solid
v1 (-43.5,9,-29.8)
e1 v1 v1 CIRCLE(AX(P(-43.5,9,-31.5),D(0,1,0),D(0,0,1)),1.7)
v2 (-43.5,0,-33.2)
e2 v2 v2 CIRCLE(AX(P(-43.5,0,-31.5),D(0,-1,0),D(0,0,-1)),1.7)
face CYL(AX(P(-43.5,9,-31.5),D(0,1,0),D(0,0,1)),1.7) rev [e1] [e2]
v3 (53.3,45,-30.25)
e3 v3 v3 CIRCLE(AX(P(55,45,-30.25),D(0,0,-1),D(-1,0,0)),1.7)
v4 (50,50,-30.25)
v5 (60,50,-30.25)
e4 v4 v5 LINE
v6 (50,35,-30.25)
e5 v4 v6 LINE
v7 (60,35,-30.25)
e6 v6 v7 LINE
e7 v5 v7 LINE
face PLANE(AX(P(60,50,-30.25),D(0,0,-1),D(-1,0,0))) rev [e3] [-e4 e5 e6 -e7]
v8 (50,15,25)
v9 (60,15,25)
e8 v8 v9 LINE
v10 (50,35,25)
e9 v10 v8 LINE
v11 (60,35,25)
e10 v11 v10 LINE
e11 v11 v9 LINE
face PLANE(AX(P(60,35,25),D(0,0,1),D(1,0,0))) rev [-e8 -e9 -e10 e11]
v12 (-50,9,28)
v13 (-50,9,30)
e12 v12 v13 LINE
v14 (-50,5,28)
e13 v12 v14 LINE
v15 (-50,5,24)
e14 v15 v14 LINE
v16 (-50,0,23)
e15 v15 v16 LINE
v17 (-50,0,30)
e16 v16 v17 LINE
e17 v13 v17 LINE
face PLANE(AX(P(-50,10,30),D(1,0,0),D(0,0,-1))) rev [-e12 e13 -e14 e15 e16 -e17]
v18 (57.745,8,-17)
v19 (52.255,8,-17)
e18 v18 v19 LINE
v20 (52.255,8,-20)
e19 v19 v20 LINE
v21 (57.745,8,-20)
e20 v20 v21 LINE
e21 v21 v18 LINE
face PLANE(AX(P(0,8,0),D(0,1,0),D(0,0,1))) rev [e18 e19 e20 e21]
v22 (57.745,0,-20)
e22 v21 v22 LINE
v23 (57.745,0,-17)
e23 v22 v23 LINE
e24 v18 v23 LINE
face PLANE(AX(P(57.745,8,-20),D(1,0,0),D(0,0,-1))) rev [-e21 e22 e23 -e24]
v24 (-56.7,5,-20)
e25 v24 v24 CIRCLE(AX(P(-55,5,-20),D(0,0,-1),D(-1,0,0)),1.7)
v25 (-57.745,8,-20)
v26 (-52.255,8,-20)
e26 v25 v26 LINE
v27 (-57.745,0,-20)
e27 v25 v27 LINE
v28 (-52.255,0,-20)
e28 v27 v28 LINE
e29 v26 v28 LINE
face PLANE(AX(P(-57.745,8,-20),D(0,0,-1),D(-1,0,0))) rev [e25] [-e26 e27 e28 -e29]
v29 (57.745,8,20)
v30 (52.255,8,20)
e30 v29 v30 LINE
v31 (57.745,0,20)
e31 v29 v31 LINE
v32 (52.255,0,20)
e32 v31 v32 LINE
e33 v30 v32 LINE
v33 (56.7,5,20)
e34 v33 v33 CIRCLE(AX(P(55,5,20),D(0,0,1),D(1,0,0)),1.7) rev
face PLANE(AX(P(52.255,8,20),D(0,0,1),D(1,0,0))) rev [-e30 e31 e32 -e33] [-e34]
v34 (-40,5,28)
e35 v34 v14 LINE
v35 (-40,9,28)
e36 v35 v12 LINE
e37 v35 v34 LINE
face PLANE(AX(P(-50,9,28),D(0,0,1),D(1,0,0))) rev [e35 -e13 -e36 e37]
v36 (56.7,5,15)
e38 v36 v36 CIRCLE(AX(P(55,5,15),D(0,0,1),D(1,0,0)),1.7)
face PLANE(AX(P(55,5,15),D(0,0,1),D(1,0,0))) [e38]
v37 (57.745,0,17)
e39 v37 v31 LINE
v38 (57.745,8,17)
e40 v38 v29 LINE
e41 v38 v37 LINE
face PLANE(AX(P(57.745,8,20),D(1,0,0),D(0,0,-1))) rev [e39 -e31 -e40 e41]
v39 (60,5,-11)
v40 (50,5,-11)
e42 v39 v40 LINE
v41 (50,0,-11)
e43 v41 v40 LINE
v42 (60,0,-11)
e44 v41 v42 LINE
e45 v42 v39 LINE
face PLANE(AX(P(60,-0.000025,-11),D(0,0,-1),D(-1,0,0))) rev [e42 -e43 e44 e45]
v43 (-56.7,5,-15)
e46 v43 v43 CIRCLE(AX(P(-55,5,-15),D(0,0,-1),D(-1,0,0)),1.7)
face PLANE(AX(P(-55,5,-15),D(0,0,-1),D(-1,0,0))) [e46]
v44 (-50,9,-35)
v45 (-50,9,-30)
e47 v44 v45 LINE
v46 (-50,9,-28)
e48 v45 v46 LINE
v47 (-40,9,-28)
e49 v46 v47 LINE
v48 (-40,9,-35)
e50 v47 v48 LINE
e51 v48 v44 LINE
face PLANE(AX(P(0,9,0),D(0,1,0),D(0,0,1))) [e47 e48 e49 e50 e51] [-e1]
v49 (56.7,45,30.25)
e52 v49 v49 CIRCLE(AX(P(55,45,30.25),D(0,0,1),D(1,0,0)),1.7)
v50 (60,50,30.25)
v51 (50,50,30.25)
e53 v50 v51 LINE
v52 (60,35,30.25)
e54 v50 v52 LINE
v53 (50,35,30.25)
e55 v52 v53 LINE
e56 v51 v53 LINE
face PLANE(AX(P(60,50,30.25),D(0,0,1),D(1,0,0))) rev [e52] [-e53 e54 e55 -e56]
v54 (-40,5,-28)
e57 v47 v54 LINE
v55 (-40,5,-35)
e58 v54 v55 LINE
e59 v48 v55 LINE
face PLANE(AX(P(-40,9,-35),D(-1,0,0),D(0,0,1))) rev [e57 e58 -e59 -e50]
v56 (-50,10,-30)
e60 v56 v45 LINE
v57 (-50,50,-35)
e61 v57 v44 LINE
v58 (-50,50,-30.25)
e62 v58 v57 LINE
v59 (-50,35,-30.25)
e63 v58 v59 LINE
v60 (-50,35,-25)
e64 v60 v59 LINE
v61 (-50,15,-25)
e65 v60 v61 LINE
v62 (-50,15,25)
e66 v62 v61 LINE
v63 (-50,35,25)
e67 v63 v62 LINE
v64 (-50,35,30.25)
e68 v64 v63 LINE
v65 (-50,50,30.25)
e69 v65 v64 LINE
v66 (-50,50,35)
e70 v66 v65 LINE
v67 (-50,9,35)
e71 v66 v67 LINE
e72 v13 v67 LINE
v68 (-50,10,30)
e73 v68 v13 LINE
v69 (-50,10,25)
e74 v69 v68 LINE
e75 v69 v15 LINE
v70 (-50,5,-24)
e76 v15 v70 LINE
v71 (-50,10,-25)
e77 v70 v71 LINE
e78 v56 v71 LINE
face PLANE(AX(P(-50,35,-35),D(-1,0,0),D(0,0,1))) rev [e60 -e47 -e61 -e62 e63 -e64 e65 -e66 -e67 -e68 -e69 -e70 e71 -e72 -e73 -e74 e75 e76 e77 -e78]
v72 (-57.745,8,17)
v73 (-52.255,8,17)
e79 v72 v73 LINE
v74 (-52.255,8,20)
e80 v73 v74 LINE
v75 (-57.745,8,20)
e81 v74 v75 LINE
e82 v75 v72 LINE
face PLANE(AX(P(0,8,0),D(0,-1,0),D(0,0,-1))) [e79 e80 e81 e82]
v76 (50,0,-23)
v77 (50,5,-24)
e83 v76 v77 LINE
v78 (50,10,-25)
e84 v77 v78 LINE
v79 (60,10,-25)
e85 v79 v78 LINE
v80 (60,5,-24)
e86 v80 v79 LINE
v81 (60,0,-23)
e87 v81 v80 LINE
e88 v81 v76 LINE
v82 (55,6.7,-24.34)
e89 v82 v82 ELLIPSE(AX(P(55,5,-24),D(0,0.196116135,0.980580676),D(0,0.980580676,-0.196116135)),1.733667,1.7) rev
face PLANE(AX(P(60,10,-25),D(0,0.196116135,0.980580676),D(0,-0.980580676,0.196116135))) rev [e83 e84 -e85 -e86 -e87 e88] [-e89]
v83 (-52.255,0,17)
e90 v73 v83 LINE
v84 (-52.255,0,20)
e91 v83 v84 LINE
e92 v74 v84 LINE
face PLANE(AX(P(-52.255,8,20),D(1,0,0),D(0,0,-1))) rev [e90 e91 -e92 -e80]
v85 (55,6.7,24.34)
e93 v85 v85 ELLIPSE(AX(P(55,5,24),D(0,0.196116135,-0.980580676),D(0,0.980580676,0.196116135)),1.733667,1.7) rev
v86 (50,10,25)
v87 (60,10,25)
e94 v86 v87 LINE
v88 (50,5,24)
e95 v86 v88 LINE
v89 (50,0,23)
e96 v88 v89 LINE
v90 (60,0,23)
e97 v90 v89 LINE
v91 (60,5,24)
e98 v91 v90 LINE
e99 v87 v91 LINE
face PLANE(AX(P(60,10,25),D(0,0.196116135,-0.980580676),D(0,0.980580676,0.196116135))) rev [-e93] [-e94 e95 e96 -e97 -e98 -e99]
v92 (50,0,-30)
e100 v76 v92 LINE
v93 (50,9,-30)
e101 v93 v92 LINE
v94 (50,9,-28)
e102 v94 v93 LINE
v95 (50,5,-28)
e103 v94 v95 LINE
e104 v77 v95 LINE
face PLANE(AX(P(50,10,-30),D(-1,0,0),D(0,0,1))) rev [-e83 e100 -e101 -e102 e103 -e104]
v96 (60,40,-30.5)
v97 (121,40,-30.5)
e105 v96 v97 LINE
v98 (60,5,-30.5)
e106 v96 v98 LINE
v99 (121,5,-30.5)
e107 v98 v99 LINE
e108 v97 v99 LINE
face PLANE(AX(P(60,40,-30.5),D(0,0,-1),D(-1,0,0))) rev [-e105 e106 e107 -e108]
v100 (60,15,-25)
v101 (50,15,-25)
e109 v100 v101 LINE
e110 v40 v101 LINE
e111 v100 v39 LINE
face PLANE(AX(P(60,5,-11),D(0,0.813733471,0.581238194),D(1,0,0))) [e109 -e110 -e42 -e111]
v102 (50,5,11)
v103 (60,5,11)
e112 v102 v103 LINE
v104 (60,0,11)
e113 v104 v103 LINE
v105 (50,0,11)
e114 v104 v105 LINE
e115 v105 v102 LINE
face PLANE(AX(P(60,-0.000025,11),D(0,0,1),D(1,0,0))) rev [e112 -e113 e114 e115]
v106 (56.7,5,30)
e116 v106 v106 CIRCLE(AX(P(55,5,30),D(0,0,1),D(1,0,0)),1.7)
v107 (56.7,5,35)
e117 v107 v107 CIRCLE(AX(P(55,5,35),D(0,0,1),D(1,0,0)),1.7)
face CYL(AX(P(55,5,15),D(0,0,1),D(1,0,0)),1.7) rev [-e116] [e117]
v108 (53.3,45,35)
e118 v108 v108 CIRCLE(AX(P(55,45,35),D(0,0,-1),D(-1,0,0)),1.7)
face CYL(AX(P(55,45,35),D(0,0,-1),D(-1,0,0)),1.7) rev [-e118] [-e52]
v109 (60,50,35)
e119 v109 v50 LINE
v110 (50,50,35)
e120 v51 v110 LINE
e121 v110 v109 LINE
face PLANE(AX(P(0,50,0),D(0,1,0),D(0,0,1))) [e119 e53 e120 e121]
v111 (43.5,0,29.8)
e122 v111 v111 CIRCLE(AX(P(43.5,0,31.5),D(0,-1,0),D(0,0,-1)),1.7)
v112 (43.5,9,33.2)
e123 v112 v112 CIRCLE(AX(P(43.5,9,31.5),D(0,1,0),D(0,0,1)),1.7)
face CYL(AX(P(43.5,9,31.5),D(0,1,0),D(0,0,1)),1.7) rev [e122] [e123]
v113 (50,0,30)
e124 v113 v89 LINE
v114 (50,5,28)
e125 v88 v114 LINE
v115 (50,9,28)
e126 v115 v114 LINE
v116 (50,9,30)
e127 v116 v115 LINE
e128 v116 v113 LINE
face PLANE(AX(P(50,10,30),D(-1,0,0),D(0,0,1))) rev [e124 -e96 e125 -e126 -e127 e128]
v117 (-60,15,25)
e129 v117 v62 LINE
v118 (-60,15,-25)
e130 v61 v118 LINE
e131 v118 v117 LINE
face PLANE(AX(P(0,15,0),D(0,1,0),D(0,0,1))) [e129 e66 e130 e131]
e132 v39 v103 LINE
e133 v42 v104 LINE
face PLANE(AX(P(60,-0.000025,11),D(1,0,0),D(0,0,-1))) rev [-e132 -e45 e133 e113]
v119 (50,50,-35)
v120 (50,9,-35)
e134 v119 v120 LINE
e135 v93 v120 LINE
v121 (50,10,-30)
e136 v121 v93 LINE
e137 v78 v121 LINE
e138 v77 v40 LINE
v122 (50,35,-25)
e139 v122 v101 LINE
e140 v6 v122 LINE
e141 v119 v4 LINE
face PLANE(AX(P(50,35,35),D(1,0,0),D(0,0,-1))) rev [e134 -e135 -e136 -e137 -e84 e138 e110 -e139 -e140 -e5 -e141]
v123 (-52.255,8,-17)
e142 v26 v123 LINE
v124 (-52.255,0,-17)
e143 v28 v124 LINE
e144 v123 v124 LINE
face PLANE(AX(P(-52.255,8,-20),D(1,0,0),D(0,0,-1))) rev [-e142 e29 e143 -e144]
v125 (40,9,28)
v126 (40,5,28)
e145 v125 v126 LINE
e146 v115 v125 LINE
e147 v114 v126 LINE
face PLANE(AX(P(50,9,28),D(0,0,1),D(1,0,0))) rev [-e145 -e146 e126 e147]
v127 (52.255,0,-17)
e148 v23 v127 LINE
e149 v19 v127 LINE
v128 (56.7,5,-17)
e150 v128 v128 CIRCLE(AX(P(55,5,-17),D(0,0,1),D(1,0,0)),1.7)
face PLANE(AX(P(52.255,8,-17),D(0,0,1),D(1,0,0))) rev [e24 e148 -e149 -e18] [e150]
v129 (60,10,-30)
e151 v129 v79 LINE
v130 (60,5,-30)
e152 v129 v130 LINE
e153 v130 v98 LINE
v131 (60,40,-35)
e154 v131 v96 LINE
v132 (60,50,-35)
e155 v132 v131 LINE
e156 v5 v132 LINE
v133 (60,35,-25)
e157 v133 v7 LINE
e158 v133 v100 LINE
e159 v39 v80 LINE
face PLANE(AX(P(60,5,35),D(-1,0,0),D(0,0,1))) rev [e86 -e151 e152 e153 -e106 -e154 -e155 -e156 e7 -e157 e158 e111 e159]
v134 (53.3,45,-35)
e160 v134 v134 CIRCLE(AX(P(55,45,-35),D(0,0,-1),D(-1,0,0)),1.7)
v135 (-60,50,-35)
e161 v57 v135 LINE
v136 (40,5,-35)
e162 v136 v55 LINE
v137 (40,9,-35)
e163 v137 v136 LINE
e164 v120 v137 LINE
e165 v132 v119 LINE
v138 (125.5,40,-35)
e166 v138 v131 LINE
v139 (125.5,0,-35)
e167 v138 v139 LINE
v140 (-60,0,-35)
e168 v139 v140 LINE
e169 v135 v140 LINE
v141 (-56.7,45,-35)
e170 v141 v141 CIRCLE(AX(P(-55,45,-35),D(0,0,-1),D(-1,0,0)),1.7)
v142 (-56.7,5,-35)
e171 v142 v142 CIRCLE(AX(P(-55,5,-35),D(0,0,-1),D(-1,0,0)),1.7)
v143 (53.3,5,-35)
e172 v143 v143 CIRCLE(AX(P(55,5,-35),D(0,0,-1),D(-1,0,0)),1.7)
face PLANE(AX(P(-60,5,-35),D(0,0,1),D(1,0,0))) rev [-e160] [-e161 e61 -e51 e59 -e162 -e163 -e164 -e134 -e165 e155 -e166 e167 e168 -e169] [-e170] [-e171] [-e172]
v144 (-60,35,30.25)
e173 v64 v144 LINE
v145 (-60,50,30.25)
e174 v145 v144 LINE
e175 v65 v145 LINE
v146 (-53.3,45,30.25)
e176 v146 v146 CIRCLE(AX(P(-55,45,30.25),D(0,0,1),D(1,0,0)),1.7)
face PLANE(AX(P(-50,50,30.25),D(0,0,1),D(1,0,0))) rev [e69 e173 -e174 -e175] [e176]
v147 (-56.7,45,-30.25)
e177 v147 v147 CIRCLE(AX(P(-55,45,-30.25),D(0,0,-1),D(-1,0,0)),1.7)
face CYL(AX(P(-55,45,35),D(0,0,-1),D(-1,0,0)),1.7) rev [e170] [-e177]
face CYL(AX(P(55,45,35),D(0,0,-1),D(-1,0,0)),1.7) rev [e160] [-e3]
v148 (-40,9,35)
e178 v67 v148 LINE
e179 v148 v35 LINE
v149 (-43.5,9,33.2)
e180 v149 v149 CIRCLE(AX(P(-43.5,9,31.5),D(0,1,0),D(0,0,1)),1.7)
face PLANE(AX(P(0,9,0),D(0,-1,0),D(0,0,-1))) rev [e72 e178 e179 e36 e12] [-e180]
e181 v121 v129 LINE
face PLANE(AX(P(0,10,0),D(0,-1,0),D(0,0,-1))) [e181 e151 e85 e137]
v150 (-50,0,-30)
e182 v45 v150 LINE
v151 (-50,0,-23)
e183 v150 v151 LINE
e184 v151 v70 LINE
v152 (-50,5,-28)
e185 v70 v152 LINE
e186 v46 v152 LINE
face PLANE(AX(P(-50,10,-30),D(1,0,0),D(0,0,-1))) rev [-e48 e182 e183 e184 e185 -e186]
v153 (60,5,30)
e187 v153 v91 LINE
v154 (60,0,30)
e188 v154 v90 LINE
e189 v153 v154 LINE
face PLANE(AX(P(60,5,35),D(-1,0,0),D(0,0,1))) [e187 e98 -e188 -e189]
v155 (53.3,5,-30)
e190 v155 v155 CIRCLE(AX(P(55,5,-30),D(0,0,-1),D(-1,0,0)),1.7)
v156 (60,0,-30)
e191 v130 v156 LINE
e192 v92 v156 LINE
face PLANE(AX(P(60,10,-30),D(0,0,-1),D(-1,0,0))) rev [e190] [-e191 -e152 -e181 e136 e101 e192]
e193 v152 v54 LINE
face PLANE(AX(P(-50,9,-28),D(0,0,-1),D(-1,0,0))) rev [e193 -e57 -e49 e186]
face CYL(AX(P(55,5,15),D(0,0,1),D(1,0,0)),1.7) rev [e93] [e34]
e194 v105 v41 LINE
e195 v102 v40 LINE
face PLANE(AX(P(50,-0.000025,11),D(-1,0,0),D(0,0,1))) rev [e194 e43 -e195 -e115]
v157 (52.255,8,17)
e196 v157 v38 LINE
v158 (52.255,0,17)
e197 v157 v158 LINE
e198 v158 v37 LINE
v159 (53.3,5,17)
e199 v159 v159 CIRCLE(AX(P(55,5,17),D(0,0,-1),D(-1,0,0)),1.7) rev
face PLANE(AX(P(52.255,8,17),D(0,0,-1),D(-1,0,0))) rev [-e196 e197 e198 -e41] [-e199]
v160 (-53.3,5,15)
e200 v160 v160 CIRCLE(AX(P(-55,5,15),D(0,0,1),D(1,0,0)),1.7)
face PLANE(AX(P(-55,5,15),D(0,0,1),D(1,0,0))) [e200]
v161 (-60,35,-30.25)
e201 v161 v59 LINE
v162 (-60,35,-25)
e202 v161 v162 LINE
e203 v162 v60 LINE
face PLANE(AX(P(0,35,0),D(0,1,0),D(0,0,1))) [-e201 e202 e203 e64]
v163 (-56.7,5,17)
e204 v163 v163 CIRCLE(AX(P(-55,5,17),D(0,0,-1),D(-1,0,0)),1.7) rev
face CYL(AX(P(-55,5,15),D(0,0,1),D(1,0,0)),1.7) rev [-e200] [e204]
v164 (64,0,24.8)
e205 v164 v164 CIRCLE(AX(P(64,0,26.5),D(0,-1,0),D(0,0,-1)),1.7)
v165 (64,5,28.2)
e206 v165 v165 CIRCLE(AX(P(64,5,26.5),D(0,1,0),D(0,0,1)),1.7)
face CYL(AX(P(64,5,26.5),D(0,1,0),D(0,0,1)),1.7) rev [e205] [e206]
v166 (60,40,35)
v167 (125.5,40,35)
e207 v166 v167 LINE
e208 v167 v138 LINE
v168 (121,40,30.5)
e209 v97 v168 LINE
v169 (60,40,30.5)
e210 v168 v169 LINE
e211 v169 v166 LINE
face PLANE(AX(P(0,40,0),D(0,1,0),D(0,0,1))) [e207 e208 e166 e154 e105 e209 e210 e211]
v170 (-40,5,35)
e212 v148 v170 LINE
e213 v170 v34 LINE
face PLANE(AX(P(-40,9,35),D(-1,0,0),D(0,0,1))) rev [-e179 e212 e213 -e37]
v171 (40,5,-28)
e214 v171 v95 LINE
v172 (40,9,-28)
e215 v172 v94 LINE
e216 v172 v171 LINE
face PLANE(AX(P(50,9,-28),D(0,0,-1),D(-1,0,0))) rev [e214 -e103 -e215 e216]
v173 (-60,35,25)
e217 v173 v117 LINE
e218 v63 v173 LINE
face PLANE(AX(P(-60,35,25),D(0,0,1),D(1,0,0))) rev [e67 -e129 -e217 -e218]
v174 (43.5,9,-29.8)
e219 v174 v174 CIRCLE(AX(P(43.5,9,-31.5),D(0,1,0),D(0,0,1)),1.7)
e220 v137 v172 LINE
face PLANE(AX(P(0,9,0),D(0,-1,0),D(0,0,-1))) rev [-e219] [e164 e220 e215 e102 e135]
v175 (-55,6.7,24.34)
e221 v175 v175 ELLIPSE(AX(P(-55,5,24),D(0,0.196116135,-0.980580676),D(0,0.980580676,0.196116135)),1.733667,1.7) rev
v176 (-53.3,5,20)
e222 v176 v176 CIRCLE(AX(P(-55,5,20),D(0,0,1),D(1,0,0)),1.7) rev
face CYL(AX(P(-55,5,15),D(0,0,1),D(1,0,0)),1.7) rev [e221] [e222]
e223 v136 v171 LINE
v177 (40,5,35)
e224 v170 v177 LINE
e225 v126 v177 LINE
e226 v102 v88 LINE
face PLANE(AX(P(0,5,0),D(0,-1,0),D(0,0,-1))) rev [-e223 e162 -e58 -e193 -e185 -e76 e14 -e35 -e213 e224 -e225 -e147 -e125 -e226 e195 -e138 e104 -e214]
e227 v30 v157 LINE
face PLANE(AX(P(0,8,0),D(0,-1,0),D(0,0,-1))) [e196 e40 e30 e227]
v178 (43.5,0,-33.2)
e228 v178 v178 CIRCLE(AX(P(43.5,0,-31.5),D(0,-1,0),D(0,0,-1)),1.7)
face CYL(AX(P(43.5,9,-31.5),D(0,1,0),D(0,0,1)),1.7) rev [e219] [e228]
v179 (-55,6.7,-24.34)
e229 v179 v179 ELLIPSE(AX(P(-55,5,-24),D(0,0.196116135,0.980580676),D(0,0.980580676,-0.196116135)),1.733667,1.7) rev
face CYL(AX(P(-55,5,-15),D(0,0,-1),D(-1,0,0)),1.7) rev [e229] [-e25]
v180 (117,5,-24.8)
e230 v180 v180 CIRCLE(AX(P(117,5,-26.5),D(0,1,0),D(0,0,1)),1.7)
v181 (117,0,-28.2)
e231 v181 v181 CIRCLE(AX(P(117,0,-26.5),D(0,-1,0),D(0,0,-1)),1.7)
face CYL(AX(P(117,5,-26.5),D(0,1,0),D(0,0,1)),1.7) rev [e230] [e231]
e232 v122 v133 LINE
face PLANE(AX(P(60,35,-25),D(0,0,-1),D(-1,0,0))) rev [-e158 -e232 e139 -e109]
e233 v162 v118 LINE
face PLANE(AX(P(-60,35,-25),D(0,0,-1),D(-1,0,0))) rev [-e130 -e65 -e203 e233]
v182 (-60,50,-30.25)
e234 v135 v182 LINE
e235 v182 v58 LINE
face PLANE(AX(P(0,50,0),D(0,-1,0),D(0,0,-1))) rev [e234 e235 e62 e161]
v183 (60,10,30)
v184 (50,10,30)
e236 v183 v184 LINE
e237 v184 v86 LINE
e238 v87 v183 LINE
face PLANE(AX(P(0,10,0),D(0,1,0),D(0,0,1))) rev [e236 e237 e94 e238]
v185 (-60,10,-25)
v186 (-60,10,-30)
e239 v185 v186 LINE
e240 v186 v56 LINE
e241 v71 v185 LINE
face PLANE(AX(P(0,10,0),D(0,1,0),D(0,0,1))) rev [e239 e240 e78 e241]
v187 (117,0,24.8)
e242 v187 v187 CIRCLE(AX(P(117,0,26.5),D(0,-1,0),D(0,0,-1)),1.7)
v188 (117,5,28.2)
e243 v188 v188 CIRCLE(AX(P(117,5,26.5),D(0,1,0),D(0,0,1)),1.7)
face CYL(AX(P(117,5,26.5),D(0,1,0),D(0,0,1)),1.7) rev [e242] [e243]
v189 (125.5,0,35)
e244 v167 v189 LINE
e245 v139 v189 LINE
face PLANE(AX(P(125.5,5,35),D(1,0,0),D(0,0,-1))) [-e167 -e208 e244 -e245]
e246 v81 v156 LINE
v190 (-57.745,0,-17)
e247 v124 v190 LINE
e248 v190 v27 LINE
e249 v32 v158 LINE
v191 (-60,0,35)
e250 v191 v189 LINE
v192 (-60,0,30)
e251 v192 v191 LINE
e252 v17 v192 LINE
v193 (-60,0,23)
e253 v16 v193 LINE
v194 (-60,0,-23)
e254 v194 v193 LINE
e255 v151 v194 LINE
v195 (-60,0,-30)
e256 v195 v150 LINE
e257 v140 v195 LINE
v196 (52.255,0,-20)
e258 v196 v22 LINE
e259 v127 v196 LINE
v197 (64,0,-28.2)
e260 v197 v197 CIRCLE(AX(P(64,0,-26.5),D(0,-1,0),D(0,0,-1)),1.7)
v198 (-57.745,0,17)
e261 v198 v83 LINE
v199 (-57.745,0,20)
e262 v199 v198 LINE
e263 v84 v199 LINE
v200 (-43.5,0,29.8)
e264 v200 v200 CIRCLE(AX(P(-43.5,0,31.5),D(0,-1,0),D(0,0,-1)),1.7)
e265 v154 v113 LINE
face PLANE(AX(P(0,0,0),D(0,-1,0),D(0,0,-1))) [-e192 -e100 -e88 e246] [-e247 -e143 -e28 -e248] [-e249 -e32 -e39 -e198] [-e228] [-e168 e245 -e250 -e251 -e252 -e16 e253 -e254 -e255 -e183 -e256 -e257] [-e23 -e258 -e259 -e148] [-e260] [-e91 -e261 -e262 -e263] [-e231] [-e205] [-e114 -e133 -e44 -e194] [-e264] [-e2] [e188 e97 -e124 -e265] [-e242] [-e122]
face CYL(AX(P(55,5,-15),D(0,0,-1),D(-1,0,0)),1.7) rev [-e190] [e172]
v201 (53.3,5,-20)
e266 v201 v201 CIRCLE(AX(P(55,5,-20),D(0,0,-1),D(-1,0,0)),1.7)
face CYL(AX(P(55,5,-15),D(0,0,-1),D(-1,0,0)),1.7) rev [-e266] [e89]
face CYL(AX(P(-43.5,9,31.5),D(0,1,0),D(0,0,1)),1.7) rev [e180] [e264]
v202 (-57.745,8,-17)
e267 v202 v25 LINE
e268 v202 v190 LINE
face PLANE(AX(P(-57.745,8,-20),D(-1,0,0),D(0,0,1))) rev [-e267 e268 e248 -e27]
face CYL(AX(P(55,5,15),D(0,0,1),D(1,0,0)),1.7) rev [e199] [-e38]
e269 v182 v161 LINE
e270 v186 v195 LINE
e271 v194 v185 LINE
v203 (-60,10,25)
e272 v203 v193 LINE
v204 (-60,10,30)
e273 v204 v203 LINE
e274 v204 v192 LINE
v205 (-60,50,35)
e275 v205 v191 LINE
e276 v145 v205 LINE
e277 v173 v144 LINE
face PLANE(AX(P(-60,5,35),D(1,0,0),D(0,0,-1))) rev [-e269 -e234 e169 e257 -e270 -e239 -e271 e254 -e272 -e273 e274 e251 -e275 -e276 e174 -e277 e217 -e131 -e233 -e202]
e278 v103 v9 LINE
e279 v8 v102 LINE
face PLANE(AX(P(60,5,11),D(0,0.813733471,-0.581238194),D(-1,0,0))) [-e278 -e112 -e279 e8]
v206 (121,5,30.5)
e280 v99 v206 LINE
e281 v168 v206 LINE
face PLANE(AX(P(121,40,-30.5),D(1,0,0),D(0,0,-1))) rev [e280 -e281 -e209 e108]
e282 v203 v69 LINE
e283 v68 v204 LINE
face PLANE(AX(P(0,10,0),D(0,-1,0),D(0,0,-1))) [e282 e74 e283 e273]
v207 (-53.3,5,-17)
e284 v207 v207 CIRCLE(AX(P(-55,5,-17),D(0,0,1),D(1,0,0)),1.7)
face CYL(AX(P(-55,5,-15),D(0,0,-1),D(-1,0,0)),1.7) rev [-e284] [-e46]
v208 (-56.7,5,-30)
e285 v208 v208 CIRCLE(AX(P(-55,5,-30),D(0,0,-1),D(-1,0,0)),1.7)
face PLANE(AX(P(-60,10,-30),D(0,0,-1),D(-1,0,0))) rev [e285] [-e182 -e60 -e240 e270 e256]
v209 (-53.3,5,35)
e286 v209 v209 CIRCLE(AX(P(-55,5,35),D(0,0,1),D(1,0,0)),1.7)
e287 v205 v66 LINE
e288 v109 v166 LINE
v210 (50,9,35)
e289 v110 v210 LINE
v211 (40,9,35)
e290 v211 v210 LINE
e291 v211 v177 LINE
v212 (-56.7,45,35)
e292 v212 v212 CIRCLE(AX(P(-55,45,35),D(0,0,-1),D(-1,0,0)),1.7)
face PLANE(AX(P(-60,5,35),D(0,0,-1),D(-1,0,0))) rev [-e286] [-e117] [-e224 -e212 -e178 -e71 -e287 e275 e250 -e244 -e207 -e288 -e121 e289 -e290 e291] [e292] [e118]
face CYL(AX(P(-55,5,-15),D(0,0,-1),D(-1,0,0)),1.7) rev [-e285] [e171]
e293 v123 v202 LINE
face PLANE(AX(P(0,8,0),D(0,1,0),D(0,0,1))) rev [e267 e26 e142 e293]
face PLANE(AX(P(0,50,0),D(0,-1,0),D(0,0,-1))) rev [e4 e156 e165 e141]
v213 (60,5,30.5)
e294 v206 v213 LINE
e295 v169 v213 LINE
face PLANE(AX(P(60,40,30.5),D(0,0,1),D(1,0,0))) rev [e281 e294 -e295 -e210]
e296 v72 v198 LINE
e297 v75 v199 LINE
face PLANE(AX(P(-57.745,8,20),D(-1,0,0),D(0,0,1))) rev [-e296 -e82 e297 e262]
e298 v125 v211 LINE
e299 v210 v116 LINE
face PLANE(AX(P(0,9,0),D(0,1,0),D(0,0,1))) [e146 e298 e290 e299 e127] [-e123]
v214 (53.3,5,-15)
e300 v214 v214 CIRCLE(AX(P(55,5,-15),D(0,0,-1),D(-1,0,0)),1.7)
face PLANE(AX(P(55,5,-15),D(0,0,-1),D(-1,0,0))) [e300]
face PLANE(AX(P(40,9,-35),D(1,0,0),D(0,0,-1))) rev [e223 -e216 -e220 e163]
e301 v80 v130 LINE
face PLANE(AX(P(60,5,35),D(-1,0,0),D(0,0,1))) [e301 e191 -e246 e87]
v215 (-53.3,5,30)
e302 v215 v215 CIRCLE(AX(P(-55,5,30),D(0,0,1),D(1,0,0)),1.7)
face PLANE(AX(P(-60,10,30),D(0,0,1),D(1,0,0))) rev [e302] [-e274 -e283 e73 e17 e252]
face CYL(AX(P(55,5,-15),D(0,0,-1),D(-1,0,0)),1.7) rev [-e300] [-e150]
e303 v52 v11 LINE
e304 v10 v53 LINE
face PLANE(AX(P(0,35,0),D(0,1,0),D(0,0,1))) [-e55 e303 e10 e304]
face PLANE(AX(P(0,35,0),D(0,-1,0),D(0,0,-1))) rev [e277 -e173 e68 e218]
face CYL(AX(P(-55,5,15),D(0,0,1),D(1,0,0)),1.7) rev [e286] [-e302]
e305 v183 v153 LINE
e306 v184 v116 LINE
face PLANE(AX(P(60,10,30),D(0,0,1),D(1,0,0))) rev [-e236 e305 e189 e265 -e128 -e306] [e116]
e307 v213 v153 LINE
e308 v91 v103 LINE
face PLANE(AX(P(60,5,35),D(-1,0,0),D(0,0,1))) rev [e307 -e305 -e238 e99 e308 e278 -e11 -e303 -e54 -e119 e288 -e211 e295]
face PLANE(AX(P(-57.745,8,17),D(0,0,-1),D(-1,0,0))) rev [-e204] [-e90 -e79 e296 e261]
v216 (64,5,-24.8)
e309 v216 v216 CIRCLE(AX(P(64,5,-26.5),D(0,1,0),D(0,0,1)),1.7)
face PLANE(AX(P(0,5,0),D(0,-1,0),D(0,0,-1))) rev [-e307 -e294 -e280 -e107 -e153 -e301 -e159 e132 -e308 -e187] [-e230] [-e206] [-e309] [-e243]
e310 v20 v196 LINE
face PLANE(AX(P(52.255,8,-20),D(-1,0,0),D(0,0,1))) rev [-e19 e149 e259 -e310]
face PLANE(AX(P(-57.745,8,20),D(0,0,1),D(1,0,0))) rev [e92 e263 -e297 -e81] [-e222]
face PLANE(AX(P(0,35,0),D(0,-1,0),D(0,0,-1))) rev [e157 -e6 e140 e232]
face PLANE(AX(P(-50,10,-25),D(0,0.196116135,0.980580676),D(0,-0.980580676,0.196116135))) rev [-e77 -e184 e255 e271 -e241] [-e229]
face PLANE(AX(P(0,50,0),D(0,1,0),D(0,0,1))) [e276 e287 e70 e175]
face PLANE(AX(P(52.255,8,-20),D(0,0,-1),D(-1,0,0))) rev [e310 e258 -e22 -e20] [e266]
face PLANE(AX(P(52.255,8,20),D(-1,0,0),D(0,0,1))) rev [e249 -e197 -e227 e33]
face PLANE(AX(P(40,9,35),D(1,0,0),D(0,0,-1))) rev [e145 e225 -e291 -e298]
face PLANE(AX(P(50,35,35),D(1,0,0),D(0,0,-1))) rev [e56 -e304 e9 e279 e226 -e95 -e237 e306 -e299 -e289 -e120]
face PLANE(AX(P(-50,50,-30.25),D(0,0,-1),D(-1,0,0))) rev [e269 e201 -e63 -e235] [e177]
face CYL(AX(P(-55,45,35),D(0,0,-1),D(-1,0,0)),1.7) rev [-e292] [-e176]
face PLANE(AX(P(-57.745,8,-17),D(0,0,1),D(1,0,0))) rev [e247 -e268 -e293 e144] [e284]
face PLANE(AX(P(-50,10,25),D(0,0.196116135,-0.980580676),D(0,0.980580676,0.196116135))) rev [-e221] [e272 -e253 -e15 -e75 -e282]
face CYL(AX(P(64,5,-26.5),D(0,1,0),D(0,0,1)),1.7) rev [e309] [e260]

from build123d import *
from OCP.BRepFilletAPI import BRepFilletAPI_MakeChamfer

# Parameters (mm, degrees)
SKETCH1_W                = 120
SKETCH1_H                = 70
BOSS_EXTRUDE1_DEPTH      = 5
SKETCH4_W                = 10
SKETCH4_H                = 10
BOSS_EXTRUDE2_DEPTH      = 30
SKETCH5_W                = 10
SKETCH5_H                = 5
CUT_EXTRUDE2_DEPTH       = 10
SKETCH8_W                = 10
SKETCH8_H                = 7
BOSS_EXTRUDE5_DEPTH      = 4
M3_CLEARANCE_HOLE2_D     = 3.4
M3_CLEARANCE_HOLE2_DEPTH = 65
M3_CLEARANCE_HOLE2_TIP   = 1.021463052
SKETCH12_W               = 65.5
SKETCH12_H               = 70
BOSS_EXTRUDE6_DEPTH      = 5
BOSS_EXTRUDE7_DEPTH      = 35
M3_CLEARANCE_HOLE3_D     = 3.4
M3_CLEARANCE_HOLE3_DEPTH = 65
M3_CLEARANCE_HOLE3_TIP   = 1.021463052
SKETCH24_W               = 10
SKETCH24_H               = 50
BOSS_EXTRUDE10_DEPTH     = 10
SKETCH16_W               = 10
SKETCH16_H               = 22
CUT_EXTRUDE5_DEPTH       = 133.665933834
SKETCH22_R               = 1.7
CUT_EXTRUDE7_DEPTH       = 20
CHAMFER2_SIZE            = 10
CHAMFER2_SIZE_2          = 14
SKETCH25_W               = 5.49
SKETCH25_H               = 3
CUT_EXTRUDE8_DEPTH       = 8
CUT_EXTRUDE9_START       = -20
SKETCH26_R               = 1.7
CUT_EXTRUDE9_DEPTH       = 20
CUT_EXTRUDE11_DEPTH      = 10
LPATTERN1_COUNT          = 2
LPATTERN1_PITCH          = 110
SKETCH29_W               = 10
SKETCH29_H               = 4.75
BOSS_EXTRUDE11_DEPTH     = 15
SKETCH31_R               = 1.7
CUT_EXTRUDE13_DEPTH      = 153.152062096


with BuildPart() as part:
    # Sketch1 → Boss-Extrude1 (new body)
    with BuildSketch(Plane(origin=(0, 0, 0), x_dir=(1, 0, 0), z_dir=(0, 1, 0))):
        Rectangle(SKETCH1_W, SKETCH1_H)
    extrude(amount=BOSS_EXTRUDE1_DEPTH)

    # Sketch4 → Boss-Extrude2 (add)
    with BuildSketch(Plane(origin=(0, 5, 0), x_dir=(1, 0, 0), z_dir=(0, 1, 0))):
        with Locations((-55, -30)):
            Rectangle(SKETCH4_W, SKETCH4_H)
        with Locations((-55, 30)):
            Rectangle(SKETCH4_W, SKETCH4_H)
        with Locations((55, -30)):
            Rectangle(SKETCH4_W, SKETCH4_H)
        with Locations((55, 30)):
            Rectangle(SKETCH4_W, SKETCH4_H)
    extrude(amount=BOSS_EXTRUDE2_DEPTH)

    # Sketch5 → Cut-Extrude2 (cut)
    with BuildSketch(Plane.XZ):
        with Locations((-55, -27.5)):
            Rectangle(SKETCH5_W, SKETCH5_H)
        with Locations((-55, 27.5)):
            Rectangle(SKETCH5_W, SKETCH5_H)
        with Locations((55, 27.5)):
            Rectangle(SKETCH5_W, SKETCH5_H)
        with Locations((55, -27.5)):
            Rectangle(SKETCH5_W, SKETCH5_H)
    extrude(amount=-CUT_EXTRUDE2_DEPTH, mode=Mode.SUBTRACT)

    # Sketch8 → Boss-Extrude5 (add)
    with BuildSketch(Plane(origin=(0, 5, 0), x_dir=(1, 0, 0), z_dir=(0, 1, 0))):
        with Locations((-45, 31.5)):
            Rectangle(SKETCH8_W, SKETCH8_H)
        with Locations((-45, -31.5)):
            Rectangle(SKETCH8_W, SKETCH8_H)
        with Locations((45, -31.5)):
            Rectangle(SKETCH8_W, SKETCH8_H)
        with Locations((45, 31.5)):
            Rectangle(SKETCH8_W, SKETCH8_H)
    extrude(amount=BOSS_EXTRUDE5_DEPTH)

    # M3 Clearance Hole2
    with Locations(Plane(origin=(0, 9, 0), x_dir=(1, 0, 0), z_dir=(0, 1, 0))):
        with Locations((-43.5, -31.5), (-43.5, 31.5), (43.5, 31.5), (43.5, -31.5)):
            Hole(M3_CLEARANCE_HOLE2_D / 2, depth=M3_CLEARANCE_HOLE2_DEPTH)
            with Locations((0, 0, -(M3_CLEARANCE_HOLE2_DEPTH + M3_CLEARANCE_HOLE2_TIP / 2))):  # 118° drill point
                Cone(0, M3_CLEARANCE_HOLE2_D / 2, M3_CLEARANCE_HOLE2_TIP, mode=Mode.SUBTRACT)

    # Sketch12 → Boss-Extrude6 (add)
    with BuildSketch(Plane.XZ):
        with Locations((92.75, 0)):
            Rectangle(SKETCH12_W, SKETCH12_H)
    extrude(amount=-BOSS_EXTRUDE6_DEPTH)

    # Sketch13 → Boss-Extrude7 (add)
    with BuildSketch(Plane(origin=(0, 5, 0), x_dir=(1, 0, 0), z_dir=(0, 1, 0))):
        Polygon((60, 35), (125.5, 35), (125.5, -35), (60, -35), (60, -30.5), (121, -30.5), (121, 30.5), (60, 30.5), align=None)
    extrude(amount=BOSS_EXTRUDE7_DEPTH)

    # M3 Clearance Hole3
    with Locations(Plane(origin=(0, 5, 0), x_dir=(1, 0, 0), z_dir=(0, 1, 0))):
        with Locations((117, -26.5), (117, 26.5), (64, 26.5), (64, -26.5)):
            Hole(M3_CLEARANCE_HOLE3_D / 2, depth=M3_CLEARANCE_HOLE3_DEPTH)
            with Locations((0, 0, -(M3_CLEARANCE_HOLE3_DEPTH + M3_CLEARANCE_HOLE3_TIP / 2))):  # 118° drill point
                Cone(0, M3_CLEARANCE_HOLE3_D / 2, M3_CLEARANCE_HOLE3_TIP, mode=Mode.SUBTRACT)

    # Sketch24 → Boss-Extrude10 (add)
    with BuildSketch(Plane(origin=(0, 5, 0), x_dir=(1, 0, 0), z_dir=(0, 1, 0))):
        with Locations((-55, 0)):
            Rectangle(SKETCH24_W, SKETCH24_H)
        with Locations((55, 0)):
            Rectangle(SKETCH24_W, SKETCH24_H)
    extrude(amount=BOSS_EXTRUDE10_DEPTH)

    # Sketch16 → Cut-Extrude5 (cut, through all)
    with BuildSketch(Plane(origin=(0, 15, 0), x_dir=(1, 0, 0), z_dir=(0, 1, 0))):
        with Locations((55, 0)):
            Rectangle(SKETCH16_W, SKETCH16_H)
    extrude(amount=-CUT_EXTRUDE5_DEPTH, mode=Mode.SUBTRACT)

    # Sketch22 → Cut-Extrude7 (cut)
    with BuildSketch(Plane.XY.offset(35)):
        with Locations((-55, 5)):
            Circle(SKETCH22_R)
        with Locations((55, 5)):
            Circle(SKETCH22_R)
    extrude(amount=-CUT_EXTRUDE7_DEPTH, mode=Mode.SUBTRACT)

    # Chamfer2
    chamfer2_edges_1 = [part.edges().sort_by_distance(p)[0] for p in [
        (55, 15, 11),
    ]]
    chamfer2_side_1 = [part.faces().sort_by_distance(p)[0] for p in [
        (55, 14.8, 11),
    ]]
    chamfer2_edges_2 = [part.edges().sort_by_distance(p)[0] for p in [
        (55, 15, -11),
    ]]
    chamfer2_side_2 = [part.faces().sort_by_distance(p)[0] for p in [
        (55, 14.8, -11),
    ]]
    chamfer2 = BRepFilletAPI_MakeChamfer(part.part.solid().wrapped)
    for e in chamfer2_edges_1:
        chamfer2.Add(CHAMFER2_SIZE - 0.0001, CHAMFER2_SIZE_2 - 0.0001, e.wrapped, chamfer2_side_1[0].wrapped)
    for e in chamfer2_edges_2:
        chamfer2.Add(CHAMFER2_SIZE - 0.0001, CHAMFER2_SIZE_2 - 0.0001, e.wrapped, chamfer2_side_2[0].wrapped)
    add(Compound.cast(chamfer2.Shape()), mode=Mode.REPLACE)  # a hair under: the kernel refuses the full size

    # Sketch25 → Cut-Extrude8 (cut)
    with BuildSketch(Plane.XZ):
        with Locations((-55, -18.5)):
            Rectangle(SKETCH25_W, SKETCH25_H)
        with Locations((55, -18.5)):
            Rectangle(SKETCH25_W, SKETCH25_H)
        with Locations((55, 18.5)):
            Rectangle(SKETCH25_W, SKETCH25_H)
        with Locations((-55, 18.5)):
            Rectangle(SKETCH25_W, SKETCH25_H)
    extrude(amount=-CUT_EXTRUDE8_DEPTH, mode=Mode.SUBTRACT)

    # Sketch26 → Cut-Extrude9 (cut)
    with BuildSketch(Plane(origin=(0, 0, -35), x_dir=(-1, 0, 0), z_dir=(0, 0, -1)).offset(CUT_EXTRUDE9_START)):
        with Locations(Location((-55, 5, 0), (0, 0, 180))):
            Circle(SKETCH26_R)
        with Locations(Location((55, 5, 0), (0, 0, 180))):
            Circle(SKETCH26_R)
    extrude(amount=CUT_EXTRUDE9_DEPTH, mode=Mode.SUBTRACT)

    # Sketch28 → Cut-Extrude11 (cut)
    with BuildSketch(Plane.ZY.offset(60)):
        Polygon((-25, 10), (-23, 0), (-25, 0), align=None)
        Polygon((25, 10), (23, 0), (25, 0), align=None)
    cut_extrude11 = extrude(amount=-CUT_EXTRUDE11_DEPTH, mode=Mode.SUBTRACT)

    # LPattern1: Cut-Extrude11 ×2
    with Locations(*[(i * LPATTERN1_PITCH, 0, 0) for i in range(1, LPATTERN1_COUNT)]):
        add(cut_extrude11, mode=Mode.SUBTRACT)

    # Sketch29 → Boss-Extrude11 (add)
    with BuildSketch(Plane(origin=(0, 35, 0), x_dir=(1, 0, 0), z_dir=(0, 1, 0))):
        with Locations((55, 32.625)):
            Rectangle(SKETCH29_W, SKETCH29_H)
        with Locations((55, -32.625)):
            Rectangle(SKETCH29_W, SKETCH29_H)
        with Locations((-55, 32.625)):
            Rectangle(SKETCH29_W, SKETCH29_H)
        with Locations((-55, -32.625)):
            Rectangle(SKETCH29_W, SKETCH29_H)
    extrude(amount=BOSS_EXTRUDE11_DEPTH)

    # Sketch31 → Cut-Extrude13 (cut, through all)
    with BuildSketch(Plane(origin=(0, 0, -35), x_dir=(-1, 0, 0), z_dir=(0, 0, -1))):
        with Locations((-55, 45)):
            Circle(SKETCH31_R)
        with Locations((55, 45)):
            Circle(SKETCH31_R)
    extrude(amount=-CUT_EXTRUDE13_DEPTH, mode=Mode.SUBTRACT)


solid = part.part
